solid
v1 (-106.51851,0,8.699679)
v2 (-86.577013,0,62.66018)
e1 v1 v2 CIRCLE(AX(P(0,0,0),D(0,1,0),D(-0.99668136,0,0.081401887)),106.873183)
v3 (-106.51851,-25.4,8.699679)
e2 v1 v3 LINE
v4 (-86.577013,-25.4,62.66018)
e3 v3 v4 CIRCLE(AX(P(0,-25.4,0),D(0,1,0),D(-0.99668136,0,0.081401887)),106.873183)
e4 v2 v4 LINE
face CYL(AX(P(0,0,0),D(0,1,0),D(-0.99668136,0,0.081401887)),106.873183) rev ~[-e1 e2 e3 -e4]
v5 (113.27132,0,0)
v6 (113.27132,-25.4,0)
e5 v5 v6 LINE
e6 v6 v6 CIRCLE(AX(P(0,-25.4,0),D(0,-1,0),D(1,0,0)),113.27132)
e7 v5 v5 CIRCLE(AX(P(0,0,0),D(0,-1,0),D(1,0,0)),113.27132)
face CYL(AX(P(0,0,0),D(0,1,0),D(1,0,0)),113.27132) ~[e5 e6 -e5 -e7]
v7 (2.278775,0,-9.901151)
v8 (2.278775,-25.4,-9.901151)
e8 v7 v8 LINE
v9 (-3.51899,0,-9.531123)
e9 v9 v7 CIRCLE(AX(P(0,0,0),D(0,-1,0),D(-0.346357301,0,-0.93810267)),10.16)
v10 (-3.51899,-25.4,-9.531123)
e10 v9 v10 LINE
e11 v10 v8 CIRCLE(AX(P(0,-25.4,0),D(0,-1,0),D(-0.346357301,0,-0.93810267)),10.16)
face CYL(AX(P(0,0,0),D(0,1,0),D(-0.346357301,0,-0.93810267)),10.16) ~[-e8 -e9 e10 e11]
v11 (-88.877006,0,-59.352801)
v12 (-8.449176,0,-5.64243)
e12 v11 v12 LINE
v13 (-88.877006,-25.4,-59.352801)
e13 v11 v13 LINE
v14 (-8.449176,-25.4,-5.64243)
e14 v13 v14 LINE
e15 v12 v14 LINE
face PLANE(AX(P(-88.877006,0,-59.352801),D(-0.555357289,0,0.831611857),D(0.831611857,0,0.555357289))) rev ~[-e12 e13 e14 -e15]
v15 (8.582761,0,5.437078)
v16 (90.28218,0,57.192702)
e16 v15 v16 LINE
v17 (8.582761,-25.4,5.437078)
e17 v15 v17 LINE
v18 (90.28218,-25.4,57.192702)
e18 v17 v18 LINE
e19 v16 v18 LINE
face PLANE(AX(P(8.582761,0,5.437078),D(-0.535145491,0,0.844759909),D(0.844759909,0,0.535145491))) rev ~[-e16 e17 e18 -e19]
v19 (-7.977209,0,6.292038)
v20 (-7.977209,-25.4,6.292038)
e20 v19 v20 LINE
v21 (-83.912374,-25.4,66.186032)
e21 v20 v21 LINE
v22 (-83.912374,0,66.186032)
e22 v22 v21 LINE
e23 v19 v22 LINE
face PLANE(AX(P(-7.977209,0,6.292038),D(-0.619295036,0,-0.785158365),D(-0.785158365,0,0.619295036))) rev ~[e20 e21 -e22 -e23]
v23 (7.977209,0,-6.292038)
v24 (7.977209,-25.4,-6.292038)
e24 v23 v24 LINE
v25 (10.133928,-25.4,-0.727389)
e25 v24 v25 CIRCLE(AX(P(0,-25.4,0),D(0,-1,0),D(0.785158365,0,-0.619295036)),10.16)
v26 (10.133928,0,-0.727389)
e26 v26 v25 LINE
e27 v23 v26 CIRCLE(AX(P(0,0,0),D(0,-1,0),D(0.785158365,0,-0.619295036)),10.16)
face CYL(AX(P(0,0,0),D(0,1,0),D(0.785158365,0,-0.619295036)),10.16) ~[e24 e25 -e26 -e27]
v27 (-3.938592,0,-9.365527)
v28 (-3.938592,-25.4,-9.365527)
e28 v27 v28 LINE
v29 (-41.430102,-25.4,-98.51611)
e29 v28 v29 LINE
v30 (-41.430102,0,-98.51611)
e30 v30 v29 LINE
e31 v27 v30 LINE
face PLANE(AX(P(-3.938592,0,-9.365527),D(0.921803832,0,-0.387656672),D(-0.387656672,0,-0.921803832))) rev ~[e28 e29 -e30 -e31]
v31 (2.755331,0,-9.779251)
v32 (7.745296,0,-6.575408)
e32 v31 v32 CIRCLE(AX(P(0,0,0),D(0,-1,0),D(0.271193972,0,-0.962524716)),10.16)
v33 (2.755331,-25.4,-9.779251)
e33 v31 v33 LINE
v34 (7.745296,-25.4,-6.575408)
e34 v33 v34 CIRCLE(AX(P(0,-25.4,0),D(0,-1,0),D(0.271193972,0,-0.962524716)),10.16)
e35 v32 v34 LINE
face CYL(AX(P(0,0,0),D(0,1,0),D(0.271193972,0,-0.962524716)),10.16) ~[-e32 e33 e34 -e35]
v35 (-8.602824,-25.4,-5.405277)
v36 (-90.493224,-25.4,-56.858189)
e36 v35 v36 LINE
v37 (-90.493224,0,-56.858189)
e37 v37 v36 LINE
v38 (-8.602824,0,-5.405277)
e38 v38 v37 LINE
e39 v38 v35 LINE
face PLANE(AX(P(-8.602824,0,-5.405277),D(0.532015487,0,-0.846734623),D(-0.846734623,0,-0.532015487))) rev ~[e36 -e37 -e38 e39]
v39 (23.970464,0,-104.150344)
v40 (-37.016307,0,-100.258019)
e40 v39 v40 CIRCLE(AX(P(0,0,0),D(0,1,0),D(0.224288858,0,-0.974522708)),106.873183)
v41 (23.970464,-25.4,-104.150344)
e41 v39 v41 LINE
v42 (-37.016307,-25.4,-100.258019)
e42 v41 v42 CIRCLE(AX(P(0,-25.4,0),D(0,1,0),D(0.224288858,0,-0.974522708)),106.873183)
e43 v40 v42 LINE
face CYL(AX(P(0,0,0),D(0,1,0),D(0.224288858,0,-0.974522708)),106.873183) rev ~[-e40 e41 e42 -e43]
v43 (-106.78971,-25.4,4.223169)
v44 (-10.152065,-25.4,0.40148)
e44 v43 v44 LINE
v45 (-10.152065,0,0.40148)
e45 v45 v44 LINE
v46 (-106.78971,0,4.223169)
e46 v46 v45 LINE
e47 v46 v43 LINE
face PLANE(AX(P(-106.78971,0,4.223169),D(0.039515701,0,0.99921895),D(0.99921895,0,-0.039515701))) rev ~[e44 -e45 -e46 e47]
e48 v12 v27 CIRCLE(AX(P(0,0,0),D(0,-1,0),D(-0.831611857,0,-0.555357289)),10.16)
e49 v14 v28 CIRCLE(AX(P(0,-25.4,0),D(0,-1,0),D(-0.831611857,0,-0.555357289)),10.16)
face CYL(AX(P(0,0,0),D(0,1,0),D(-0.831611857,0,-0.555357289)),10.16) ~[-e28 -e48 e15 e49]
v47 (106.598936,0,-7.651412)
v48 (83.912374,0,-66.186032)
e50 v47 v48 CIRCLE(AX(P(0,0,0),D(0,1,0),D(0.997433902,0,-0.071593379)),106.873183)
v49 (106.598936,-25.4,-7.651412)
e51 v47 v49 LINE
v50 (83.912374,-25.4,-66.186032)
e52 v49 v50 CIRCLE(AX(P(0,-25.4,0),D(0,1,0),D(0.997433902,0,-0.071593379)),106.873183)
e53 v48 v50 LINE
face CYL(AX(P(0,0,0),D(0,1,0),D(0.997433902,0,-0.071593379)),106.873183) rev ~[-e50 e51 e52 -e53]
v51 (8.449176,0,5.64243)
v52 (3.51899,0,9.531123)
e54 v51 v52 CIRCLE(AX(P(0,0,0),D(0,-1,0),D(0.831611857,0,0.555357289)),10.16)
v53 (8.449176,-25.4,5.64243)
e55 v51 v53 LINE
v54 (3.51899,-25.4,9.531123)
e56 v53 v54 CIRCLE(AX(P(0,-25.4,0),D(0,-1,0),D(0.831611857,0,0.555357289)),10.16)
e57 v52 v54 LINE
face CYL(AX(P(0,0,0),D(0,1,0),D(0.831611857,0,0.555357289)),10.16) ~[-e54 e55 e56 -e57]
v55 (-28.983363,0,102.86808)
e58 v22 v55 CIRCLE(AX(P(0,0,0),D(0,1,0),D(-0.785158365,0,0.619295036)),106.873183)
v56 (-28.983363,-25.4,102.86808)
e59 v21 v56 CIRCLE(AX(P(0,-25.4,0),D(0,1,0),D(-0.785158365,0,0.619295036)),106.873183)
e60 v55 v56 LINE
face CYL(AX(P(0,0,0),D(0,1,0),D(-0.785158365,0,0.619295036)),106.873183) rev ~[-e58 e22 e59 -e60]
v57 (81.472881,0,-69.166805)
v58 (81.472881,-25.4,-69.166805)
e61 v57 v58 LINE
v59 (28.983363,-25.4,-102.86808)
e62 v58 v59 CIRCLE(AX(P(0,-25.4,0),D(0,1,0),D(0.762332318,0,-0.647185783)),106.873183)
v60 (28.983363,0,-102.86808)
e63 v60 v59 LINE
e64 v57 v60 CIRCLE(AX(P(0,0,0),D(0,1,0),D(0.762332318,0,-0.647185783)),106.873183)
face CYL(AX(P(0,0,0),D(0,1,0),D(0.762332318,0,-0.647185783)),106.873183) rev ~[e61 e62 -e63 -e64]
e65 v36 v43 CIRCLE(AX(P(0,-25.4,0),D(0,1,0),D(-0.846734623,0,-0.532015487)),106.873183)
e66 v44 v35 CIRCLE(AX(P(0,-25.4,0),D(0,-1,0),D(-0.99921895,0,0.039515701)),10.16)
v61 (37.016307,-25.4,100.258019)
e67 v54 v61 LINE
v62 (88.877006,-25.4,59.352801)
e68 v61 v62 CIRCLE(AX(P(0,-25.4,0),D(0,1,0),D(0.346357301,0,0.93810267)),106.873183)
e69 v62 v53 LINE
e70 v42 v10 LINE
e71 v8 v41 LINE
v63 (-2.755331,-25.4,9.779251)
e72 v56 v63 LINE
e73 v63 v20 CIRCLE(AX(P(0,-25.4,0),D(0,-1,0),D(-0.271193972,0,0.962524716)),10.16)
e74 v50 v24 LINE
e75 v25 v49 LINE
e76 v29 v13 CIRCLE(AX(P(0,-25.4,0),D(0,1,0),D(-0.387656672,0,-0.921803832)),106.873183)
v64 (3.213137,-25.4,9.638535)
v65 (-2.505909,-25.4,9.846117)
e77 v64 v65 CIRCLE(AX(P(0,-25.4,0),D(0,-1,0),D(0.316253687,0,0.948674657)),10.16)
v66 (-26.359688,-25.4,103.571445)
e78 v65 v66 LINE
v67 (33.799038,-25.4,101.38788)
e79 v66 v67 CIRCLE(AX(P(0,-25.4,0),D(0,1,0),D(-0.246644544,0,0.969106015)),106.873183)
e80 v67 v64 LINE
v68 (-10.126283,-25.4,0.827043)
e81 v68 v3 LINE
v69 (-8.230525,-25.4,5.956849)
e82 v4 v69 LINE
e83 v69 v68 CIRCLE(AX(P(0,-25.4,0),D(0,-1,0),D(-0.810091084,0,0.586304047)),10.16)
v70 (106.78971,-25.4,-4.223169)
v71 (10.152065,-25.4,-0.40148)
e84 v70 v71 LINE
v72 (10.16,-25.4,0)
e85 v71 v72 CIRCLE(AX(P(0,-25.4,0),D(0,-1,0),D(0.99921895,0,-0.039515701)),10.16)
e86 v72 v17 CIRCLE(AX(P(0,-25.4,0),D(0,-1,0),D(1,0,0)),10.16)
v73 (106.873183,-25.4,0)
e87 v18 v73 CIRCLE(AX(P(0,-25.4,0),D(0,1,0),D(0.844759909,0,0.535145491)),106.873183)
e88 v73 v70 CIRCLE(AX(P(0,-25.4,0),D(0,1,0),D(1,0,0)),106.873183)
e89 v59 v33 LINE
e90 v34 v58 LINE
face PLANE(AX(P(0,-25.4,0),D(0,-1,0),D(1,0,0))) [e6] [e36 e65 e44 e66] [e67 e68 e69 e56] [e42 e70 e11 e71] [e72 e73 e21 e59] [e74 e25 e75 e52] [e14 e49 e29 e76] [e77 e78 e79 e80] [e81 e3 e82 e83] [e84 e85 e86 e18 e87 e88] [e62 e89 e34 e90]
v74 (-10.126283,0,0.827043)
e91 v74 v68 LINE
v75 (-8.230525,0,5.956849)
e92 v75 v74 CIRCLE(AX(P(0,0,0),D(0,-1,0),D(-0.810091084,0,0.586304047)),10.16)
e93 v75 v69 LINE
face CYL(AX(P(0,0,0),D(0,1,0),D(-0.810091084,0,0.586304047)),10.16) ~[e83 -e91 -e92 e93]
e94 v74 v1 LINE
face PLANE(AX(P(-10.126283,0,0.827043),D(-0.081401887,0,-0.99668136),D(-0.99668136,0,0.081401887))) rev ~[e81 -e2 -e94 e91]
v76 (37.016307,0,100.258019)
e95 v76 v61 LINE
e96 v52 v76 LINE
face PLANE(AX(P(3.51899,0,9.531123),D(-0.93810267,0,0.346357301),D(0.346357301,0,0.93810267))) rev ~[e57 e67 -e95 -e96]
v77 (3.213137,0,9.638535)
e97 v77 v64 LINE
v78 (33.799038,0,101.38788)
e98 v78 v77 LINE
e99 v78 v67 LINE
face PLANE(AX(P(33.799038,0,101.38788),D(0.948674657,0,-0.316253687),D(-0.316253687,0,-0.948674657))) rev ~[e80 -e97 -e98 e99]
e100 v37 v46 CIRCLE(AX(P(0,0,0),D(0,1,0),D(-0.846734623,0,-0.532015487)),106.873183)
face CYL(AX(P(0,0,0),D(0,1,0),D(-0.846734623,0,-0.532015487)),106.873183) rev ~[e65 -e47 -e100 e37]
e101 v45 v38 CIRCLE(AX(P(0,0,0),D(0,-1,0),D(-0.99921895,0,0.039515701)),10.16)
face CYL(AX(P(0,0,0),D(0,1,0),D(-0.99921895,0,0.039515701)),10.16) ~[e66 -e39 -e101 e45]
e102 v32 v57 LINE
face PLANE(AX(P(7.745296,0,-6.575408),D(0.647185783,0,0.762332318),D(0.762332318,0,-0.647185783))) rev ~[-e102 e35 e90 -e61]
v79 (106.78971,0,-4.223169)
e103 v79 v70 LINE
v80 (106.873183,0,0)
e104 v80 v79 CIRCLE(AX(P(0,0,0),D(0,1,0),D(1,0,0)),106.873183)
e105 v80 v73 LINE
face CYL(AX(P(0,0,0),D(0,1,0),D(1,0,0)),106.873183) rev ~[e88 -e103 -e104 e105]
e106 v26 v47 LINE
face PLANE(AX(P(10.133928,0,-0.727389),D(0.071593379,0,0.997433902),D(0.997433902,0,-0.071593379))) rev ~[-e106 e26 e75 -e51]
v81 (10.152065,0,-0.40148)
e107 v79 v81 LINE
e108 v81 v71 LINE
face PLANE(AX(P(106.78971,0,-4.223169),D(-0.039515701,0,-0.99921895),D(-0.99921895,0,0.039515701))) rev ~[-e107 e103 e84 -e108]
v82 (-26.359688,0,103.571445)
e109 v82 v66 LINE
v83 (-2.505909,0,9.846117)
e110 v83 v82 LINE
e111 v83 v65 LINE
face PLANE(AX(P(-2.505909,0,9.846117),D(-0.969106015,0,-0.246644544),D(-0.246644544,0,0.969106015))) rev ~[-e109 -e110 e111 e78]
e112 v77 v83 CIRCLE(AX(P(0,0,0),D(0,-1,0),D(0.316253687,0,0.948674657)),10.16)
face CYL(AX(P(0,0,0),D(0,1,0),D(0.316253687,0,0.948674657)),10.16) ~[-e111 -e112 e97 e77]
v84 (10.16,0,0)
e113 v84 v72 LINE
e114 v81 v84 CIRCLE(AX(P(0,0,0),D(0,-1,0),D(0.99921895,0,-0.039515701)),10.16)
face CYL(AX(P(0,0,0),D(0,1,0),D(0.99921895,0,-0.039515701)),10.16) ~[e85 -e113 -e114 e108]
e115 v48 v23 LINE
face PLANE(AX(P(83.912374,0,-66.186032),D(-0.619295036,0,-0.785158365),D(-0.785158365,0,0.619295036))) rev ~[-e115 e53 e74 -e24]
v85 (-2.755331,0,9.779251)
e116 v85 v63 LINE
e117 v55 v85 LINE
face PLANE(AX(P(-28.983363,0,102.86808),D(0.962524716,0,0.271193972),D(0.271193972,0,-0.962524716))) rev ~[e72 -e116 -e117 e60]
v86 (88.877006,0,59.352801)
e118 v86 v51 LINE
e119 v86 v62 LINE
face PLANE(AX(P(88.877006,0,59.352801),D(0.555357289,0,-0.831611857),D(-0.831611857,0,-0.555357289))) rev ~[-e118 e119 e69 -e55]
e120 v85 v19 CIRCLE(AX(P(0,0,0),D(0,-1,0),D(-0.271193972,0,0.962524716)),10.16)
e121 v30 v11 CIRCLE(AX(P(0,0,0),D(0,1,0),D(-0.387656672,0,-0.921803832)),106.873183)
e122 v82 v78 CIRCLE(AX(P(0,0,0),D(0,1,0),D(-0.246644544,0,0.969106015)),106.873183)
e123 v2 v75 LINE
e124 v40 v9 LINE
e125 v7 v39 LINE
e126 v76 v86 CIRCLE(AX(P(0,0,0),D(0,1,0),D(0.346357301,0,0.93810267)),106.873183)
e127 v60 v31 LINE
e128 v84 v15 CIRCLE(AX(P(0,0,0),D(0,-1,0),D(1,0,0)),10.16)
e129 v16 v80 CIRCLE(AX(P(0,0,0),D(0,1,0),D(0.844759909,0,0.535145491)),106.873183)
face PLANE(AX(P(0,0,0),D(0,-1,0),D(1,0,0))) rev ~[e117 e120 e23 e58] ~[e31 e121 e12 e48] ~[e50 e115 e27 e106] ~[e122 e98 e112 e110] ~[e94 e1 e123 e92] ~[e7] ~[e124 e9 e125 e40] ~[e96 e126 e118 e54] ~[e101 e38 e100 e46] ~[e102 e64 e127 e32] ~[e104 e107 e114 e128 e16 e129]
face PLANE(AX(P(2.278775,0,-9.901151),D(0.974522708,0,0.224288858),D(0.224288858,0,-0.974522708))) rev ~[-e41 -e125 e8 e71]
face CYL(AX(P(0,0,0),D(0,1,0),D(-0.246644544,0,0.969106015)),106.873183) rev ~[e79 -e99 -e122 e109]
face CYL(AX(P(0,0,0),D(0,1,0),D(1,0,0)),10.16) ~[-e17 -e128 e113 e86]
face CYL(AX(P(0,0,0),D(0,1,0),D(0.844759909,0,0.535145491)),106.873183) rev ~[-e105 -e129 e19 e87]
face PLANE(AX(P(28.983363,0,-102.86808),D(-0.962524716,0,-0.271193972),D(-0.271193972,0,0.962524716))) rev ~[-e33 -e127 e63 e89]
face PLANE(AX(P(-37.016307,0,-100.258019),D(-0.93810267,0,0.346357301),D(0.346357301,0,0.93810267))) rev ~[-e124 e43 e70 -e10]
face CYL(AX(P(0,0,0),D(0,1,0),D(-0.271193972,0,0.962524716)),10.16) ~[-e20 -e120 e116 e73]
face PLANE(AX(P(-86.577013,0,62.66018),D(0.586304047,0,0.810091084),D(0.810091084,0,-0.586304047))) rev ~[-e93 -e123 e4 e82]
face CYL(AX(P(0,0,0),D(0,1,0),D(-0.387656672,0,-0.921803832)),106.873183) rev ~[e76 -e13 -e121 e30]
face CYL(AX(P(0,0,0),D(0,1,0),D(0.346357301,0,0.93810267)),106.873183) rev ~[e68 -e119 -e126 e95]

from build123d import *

# Parameters (mm, degrees)
F1_DEPTH = 25.4
F0_R     = 113.2713200319
F2_DEPTH = 25.4


with BuildPart() as f1:
    # F0 (on Front) → F1 (new body)
    with BuildSketch(Plane.XZ):
        with BuildLine():
            Line((0, 0), (8.4491764715, 5.6424300575))
            ThreePointArc((8.4491764715, 5.6424300575), (6.2920375632, 7.9772089921), (3.518990179, 9.53112313))
            Line((3.518990179, 9.53112313), (0, 0))
        make_face()
        with BuildLine():
            Line((-2.5059085691, 9.8461171151), (0, 0))
            Line((0, 0), (3.2131374582, 9.6385345191))
            ThreePointArc((3.2131374582, 9.6385345191), (0.3685319646, 10.1533139512), (-2.5059085691, 9.8461171151))
        make_face()
        with BuildLine():
            Line((-7.9772089921, 6.2920375632), (0, 0))
            Line((0, 0), (-2.7553307558, 9.7792511179))
            ThreePointArc((-2.7553307558, 9.7792511179), (-5.6424300575, 8.4491764715), (-7.9772089921, 6.2920375632))
        make_face()
        with BuildLine():
            Line((-10.1262826145, 0.8270431738), (0, 0))
            Line((0, 0), (-8.2305254154, 5.9568491156))
            ThreePointArc((-8.2305254154, 5.9568491156), (-9.5300486626, 3.5218989889), (-10.1262826145, 0.8270431738))
        make_face()
        with BuildLine():
            Line((-8.6028237663, -5.4052773514), (0, 0))
            Line((0, 0), (-10.1520645288, 0.4014795179))
            ThreePointArc((-10.1520645288, 0.4014795179), (-9.816621877, -2.619071386), (-8.6028237663, -5.4052773514))
        make_face()
        with BuildLine():
            Line((2.2787747925, -9.9011507132), (0, 0))
            Line((0, 0), (-3.518990179, -9.53112313))
            ThreePointArc((-3.518990179, -9.53112313), (-0.6471195054, -10.139370609), (2.2787747925, -9.9011507132))
        make_face()
        with BuildLine():
            Line((7.7452963463, -6.5754075545), (0, 0))
            Line((0, 0), (2.7553307558, -9.7792511179))
            ThreePointArc((2.7553307558, -9.7792511179), (5.4892573067, -8.5494826873), (7.7452963463, -6.5754075545))
        make_face()
        with BuildLine():
            Line((10.1339284401, -0.727388734), (0, 0))
            Line((0, 0), (7.9772089921, -6.2920375632))
            ThreePointArc((7.9772089921, -6.2920375632), (9.4733655012, -3.6716407885), (10.1339284401, -0.727388734))
        make_face()
        with BuildLine():
            Line((-2.7553307558, 9.7792511179), (0, 0))
            Line((0, 0), (-2.5059085691, 9.8461171151))
            ThreePointArc((-2.5059085691, 9.8461171151), (-2.6308321067, 9.8134765719), (-2.7553307558, 9.7792511179))
        make_face()
        with BuildLine():
            Line((-8.2305254154, 5.9568491156), (0, 0))
            Line((0, 0), (-7.9772089921, 6.2920375632))
            ThreePointArc((-7.9772089921, 6.2920375632), (-8.1056000074, 6.1257528942), (-8.2305254154, 5.9568491156))
        make_face()
        with BuildLine():
            Line((-10.1520645288, 0.4014795179), (0, 0))
            Line((0, 0), (-10.1262826145, 0.8270431738))
            ThreePointArc((-10.1262826145, 0.8270431738), (-10.1414060575, 0.6143965965), (-10.1520645288, 0.4014795179))
        make_face()
        with BuildLine():
            Line((-8.4491764715, -5.6424300575), (0, 0))
            Line((0, 0), (-8.6028237663, -5.4052773514))
            ThreePointArc((-8.6028237663, -5.4052773514), (-8.5268246363, -5.5243878956), (-8.4491764715, -5.6424300575))
        make_face()
        with BuildLine():
            Line((-3.9385917856, -9.3655269337), (0, 0))
            Line((0, 0), (-8.4491764715, -5.6424300575))
            ThreePointArc((-8.4491764715, -5.6424300575), (-6.4675778453, -7.8355623164), (-3.9385917856, -9.3655269337))
        make_face()
        with BuildLine():
            Line((2.7553307558, -9.7792511179), (0, 0))
            Line((0, 0), (2.2787747925, -9.9011507132))
            ThreePointArc((2.2787747925, -9.9011507132), (2.517790608, -9.8430854133), (2.7553307558, -9.7792511179))
        make_face()
        with BuildLine():
            Line((-3.518990179, -9.53112313), (0, 0))
            Line((0, 0), (-3.9385917856, -9.3655269337))
            ThreePointArc((-3.9385917856, -9.3655269337), (-3.7297101382, -9.4506540665), (-3.518990179, -9.53112313))
        make_face()
        with BuildLine():
            Line((7.9772089921, -6.2920375632), (0, 0))
            Line((0, 0), (7.7452963463, -6.5754075545))
            ThreePointArc((7.7452963463, -6.5754075545), (7.8625293746, -6.4347674265), (7.9772089921, -6.2920375632))
        make_face()
        with BuildLine():
            ThreePointArc((10.1339284401, -0.727388734), (10.1443053921, -0.5645069636), (10.1520645288, -0.4014795179))
            Line((10.1520645288, -0.4014795179), (0, 0))
            Line((0, 0), (10.1339284401, -0.727388734))
        make_face()
        with BuildLine():
            ThreePointArc((10.1520645288, -0.4014795179), (10.1580159385, -0.2007789674), (10.16, 0))
            ThreePointArc((10.16, 0), (9.7577263861, 2.8306140277), (8.5827606744, 5.4370781864))
            Line((8.5827606744, 5.4370781864), (0, 0))
            Line((0, 0), (10.1520645288, -0.4014795179))
        make_face()
        with BuildLine():
            Line((0, 0), (8.5827606744, 5.4370781864))
            ThreePointArc((8.5827606744, 5.4370781864), (8.5165875257, 5.5401567592), (8.4491764715, 5.6424300575))
            Line((8.4491764715, 5.6424300575), (0, 0))
        make_face()
        with BuildLine():
            Line((3.2131374582, 9.6385345191), (0, 0))
            Line((0, 0), (3.518990179, 9.53112313))
            ThreePointArc((3.518990179, 9.53112313), (3.3664922297, 9.5860487203), (3.2131374582, 9.6385345191))
        make_face()
    extrude(amount=F1_DEPTH)

    # F0 (on Front) → F2 (join)
    with BuildSketch(Plane.XZ):
        Circle(F0_R)
        Polygon((90.5068083934, 60.4411965841), (91.6145348169, 58.0367329004), (104.7544467964, 29.5148519638), (108.7479900799, -4.3006120088), (108.0596985006, -7.7562623179), (102.0965224025, -37.6951021138), (85.4511357641, -67.3997329867), (60.4411965841, -90.5068083934), (29.5148519638, -104.7544467964), (-4.3006120088, -108.7479900799), (-37.6951021138, -102.0965224025), (-67.3997329867, -85.4511357641), (-90.5068083934, -60.4411965841), (-91.7838875883, -57.669130774), (-104.7544467964, -29.5148519638), (-108.7479900799, 4.3006120088), (-107.850128026, 8.8084359851), (-102.0965224025, 37.6951021138), (-87.6655406442, 63.4480026369), (-85.4511357641, 67.3997329867), (-60.4411965841, 90.5068083934), (-29.5148519638, 104.7544467964), (-26.7440517016, 105.0816731443), (4.3006120088, 108.7479900799), (34.2631514946, 102.7800935109), (37.6951021138, 102.0965224025), (67.3997329867, 85.4511357641), align=None, mode=Mode.SUBTRACT)
        with BuildLine():
            ThreePointArc((-8.2305254154, 5.9568491156), (-8.1056000074, 6.1257528942), (-7.9772089921, 6.2920375632))
            Line((-7.9772089921, 6.2920375632), (-83.9123738102, 66.1860318007))
            ThreePointArc((-83.9123738102, 66.1860318007), (-85.2629207095, 64.4368810237), (-86.577012837, 62.6601797971))
            Line((-86.577012837, 62.6601797971), (-8.2305254154, 5.9568491156))
        make_face()
        with BuildLine():
            Line((-28.9833630506, 102.8680803274), (-2.7553307558, 9.7792511179))
            ThreePointArc((-2.7553307558, 9.7792511179), (-2.6308321067, 9.8134765719), (-2.5059085691, 9.8461171151))
            Line((-2.5059085691, 9.8461171151), (-26.3596875538, 103.5714446942))
            ThreePointArc((-26.3596875538, 103.5714446942), (-27.6737600067, 103.2280983602), (-28.9833630506, 102.8680803274))
        make_face()
        with BuildLine():
            ThreePointArc((3.2131374582, 9.6385345191), (3.3664922297, 9.5860487203), (3.518990179, 9.53112313))
            Line((3.518990179, 9.53112313), (37.0163072861, 100.2580185266))
            ThreePointArc((37.0163072861, 100.2580185266), (35.4121792077, 100.8357815844), (33.7990382049, 101.3878804414))
            Line((33.7990382049, 101.3878804414), (3.2131374582, 9.6385345191))
        make_face()
        with BuildLine():
            ThreePointArc((8.4491764715, 5.6424300575), (8.5165875257, 5.5401567592), (8.5827606744, 5.4370781864))
            Line((8.5827606744, 5.4370781864), (90.282180491, 57.1927020673))
            ThreePointArc((90.282180491, 57.1927020673), (89.5861042071, 58.2769870272), (88.8770063774, 59.3528012933))
            Line((88.8770063774, 59.3528012933), (8.4491764715, 5.6424300575))
        make_face()
        with BuildLine():
            Line((106.789709851, -4.2231687065), (10.1520645288, -0.4014795179))
            ThreePointArc((10.1520645288, -0.4014795179), (10.1443053921, -0.5645069636), (10.1339284401, -0.727388734))
            Line((10.1339284401, -0.727388734), (106.5989360787, -7.6514123443))
            ThreePointArc((106.5989360787, -7.6514123443), (106.7080913827, -5.9380567058), (106.789709851, -4.2231687065))
        make_face()
        with BuildLine():
            Line((83.9123738102, -66.1860318007), (7.9772089921, -6.2920375632))
            ThreePointArc((7.9772089921, -6.2920375632), (7.8625293746, -6.4347674265), (7.7452963463, -6.5754075545))
            Line((7.7452963463, -6.5754075545), (81.4728814213, -69.1668047323))
            ThreePointArc((81.4728814213, -69.1668047323), (82.7060572982, -67.687409244), (83.9123738102, -66.1860318007))
        make_face()
        with BuildLine():
            Line((28.9833630506, -102.8680803274), (2.7553307558, -9.7792511179))
            ThreePointArc((2.7553307558, -9.7792511179), (2.517790608, -9.8430854133), (2.2787747925, -9.9011507132))
            Line((2.2787747925, -9.9011507132), (23.9704641575, -104.1503438883))
            ThreePointArc((23.9704641575, -104.1503438883), (26.4846748886, -103.5395541811), (28.9833630506, -102.8680803274))
        make_face()
        with BuildLine():
            Line((-37.0163072861, -100.2580185266), (-3.518990179, -9.53112313))
            ThreePointArc((-3.518990179, -9.53112313), (-3.7297101382, -9.4506540665), (-3.9385917856, -9.3655269337))
            Line((-3.9385917856, -9.3655269337), (-41.4301024994, -98.5161098038))
            ThreePointArc((-41.4301024994, -98.5161098038), (-39.2328735062, -99.4115633134), (-37.0163072861, -100.2580185266))
        make_face()
        with BuildLine():
            Line((-88.8770063774, -59.3528012933), (-8.4491764715, -5.6424300575))
            ThreePointArc((-8.4491764715, -5.6424300575), (-8.5268246363, -5.5243878956), (-8.6028237663, -5.4052773514))
            Line((-8.6028237663, -5.4052773514), (-90.4932244371, -56.8581886358))
            ThreePointArc((-90.4932244371, -56.8581886358), (-89.6937885179, -58.1111141287), (-88.8770063774, -59.3528012933))
        make_face()
        with BuildLine():
            Line((-106.789709851, 4.2231687065), (-10.1520645288, 0.4014795179))
            ThreePointArc((-10.1520645288, 0.4014795179), (-10.1414060575, 0.6143965965), (-10.1262826145, 0.8270431738))
            Line((-10.1262826145, 0.8270431738), (-106.5185095312, 8.6996788006))
            ThreePointArc((-106.5185095312, 8.6996788006), (-106.6775932408, 6.462846457), (-106.789709851, 4.2231687065))
        make_face()
        with BuildLine():
            ThreePointArc((-86.577012837, 62.6601797971), (-85.2629207095, 64.4368810237), (-83.9123738102, 66.1860318007))
            Line((-83.9123738102, 66.1860318007), (-85.4511357641, 67.3997329867))
            Line((-85.4511357641, 67.3997329867), (-87.6655406442, 63.4480026369))
            Line((-87.6655406442, 63.4480026369), (-86.577012837, 62.6601797971))
        make_face()
        with BuildLine():
            Line((-108.7479900799, 4.3006120088), (-106.789709851, 4.2231687065))
            ThreePointArc((-106.789709851, 4.2231687065), (-106.6775932408, 6.462846457), (-106.5185095312, 8.6996788006))
            Line((-106.5185095312, 8.6996788006), (-107.850128026, 8.8084359851))
            Line((-107.850128026, 8.8084359851), (-108.7479900799, 4.3006120088))
        make_face()
        with BuildLine():
            ThreePointArc((-106.5185095312, 8.6996788006), (-100.2467161886, 37.0469050984), (-86.577012837, 62.6601797971))
            Line((-86.577012837, 62.6601797971), (-87.6655406442, 63.4480026369))
            Line((-87.6655406442, 63.4480026369), (-102.0965224025, 37.6951021138))
            Line((-102.0965224025, 37.6951021138), (-107.850128026, 8.8084359851))
            Line((-107.850128026, 8.8084359851), (-106.5185095312, 8.6996788006))
        make_face()
        with BuildLine():
            Line((-91.7838875883, -57.669130774), (-90.4932244371, -56.8581886358))
            ThreePointArc((-90.4932244371, -56.8581886358), (-103.261183869, -27.5500488194), (-106.789709851, 4.2231687065))
            Line((-106.789709851, 4.2231687065), (-108.7479900799, 4.3006120088))
            Line((-108.7479900799, 4.3006120088), (-104.7544467964, -29.5148519638))
            Line((-104.7544467964, -29.5148519638), (-91.7838875883, -57.669130774))
        make_face()
        with BuildLine():
            Line((-90.5068083934, -60.4411965841), (-88.8770063774, -59.3528012933))
            ThreePointArc((-88.8770063774, -59.3528012933), (-89.6937885179, -58.1111141287), (-90.4932244371, -56.8581886358))
            Line((-90.4932244371, -56.8581886358), (-91.7838875883, -57.669130774))
            Line((-91.7838875883, -57.669130774), (-90.5068083934, -60.4411965841))
        make_face()
        with BuildLine():
            Line((-37.6951021138, -102.0965224025), (-37.0163072861, -100.2580185266))
            ThreePointArc((-37.0163072861, -100.2580185266), (-39.2328735062, -99.4115633134), (-41.4301024994, -98.5161098038))
            ThreePointArc((-41.4301024994, -98.5161098038), (-68.0325425023, -82.4223904327), (-88.8770063774, -59.3528012933))
            Line((-88.8770063774, -59.3528012933), (-90.5068083934, -60.4411965841))
            Line((-90.5068083934, -60.4411965841), (-67.3997329867, -85.4511357641))
            Line((-67.3997329867, -85.4511357641), (-37.6951021138, -102.0965224025))
        make_face()
        with BuildLine():
            Line((29.5148519638, -104.7544467964), (28.9833630506, -102.8680803274))
            ThreePointArc((28.9833630506, -102.8680803274), (26.4846748886, -103.5395541811), (23.9704641575, -104.1503438883))
            ThreePointArc((23.9704641575, -104.1503438883), (-6.8070591972, -106.6561823293), (-37.0163072861, -100.2580185266))
            Line((-37.0163072861, -100.2580185266), (-37.6951021138, -102.0965224025))
            Line((-37.6951021138, -102.0965224025), (-4.3006120088, -108.7479900799))
            Line((-4.3006120088, -108.7479900799), (29.5148519638, -104.7544467964))
        make_face()
        with BuildLine():
            Line((85.4511357641, -67.3997329867), (83.9123738102, -66.1860318007))
            ThreePointArc((83.9123738102, -66.1860318007), (82.7060572982, -67.687409244), (81.4728814213, -69.1668047323))
            ThreePointArc((81.4728814213, -69.1668047323), (57.7415749689, -89.9321288755), (28.9833630506, -102.8680803274))
            Line((28.9833630506, -102.8680803274), (29.5148519638, -104.7544467964))
            Line((29.5148519638, -104.7544467964), (60.4411965841, -90.5068083934))
            Line((60.4411965841, -90.5068083934), (85.4511357641, -67.3997329867))
        make_face()
        with BuildLine():
            Line((108.0596985006, -7.7562623179), (106.5989360787, -7.6514123443))
            ThreePointArc((106.5989360787, -7.6514123443), (99.6504652153, -38.6220411987), (83.9123738102, -66.1860318007))
            Line((83.9123738102, -66.1860318007), (85.4511357641, -67.3997329867))
            Line((85.4511357641, -67.3997329867), (102.0965224025, -37.6951021138))
            Line((102.0965224025, -37.6951021138), (108.0596985006, -7.7562623179))
        make_face()
        with BuildLine():
            Line((91.6145348169, 58.0367329004), (90.282180491, 57.1927020673))
            ThreePointArc((90.282180491, 57.1927020673), (102.6416613707, 29.7752688491), (106.8731831844, 0))
            ThreePointArc((106.8731831844, 0), (106.8523128133, -2.1119967875), (106.789709851, -4.2231687065))
            Line((106.789709851, -4.2231687065), (108.7479900799, -4.3006120088))
            Line((108.7479900799, -4.3006120088), (104.7544467964, 29.5148519638))
            Line((104.7544467964, 29.5148519638), (91.6145348169, 58.0367329004))
        make_face()
        with BuildLine():
            Line((108.7479900799, -4.3006120088), (106.789709851, -4.2231687065))
            ThreePointArc((106.789709851, -4.2231687065), (106.7080913827, -5.9380567058), (106.5989360787, -7.6514123443))
            Line((106.5989360787, -7.6514123443), (108.0596985006, -7.7562623179))
            Line((108.0596985006, -7.7562623179), (108.7479900799, -4.3006120088))
        make_face()
        with BuildLine():
            ThreePointArc((88.8770063774, 59.3528012933), (89.5861042071, 58.2769870272), (90.282180491, 57.1927020673))
            Line((90.282180491, 57.1927020673), (91.6145348169, 58.0367329004))
            Line((91.6145348169, 58.0367329004), (90.5068083934, 60.4411965841))
            Line((90.5068083934, 60.4411965841), (88.8770063774, 59.3528012933))
        make_face()
        with BuildLine():
            ThreePointArc((37.0163072861, 100.2580185266), (66.1860318007, 83.9123738102), (88.8770063774, 59.3528012933))
            Line((88.8770063774, 59.3528012933), (90.5068083934, 60.4411965841))
            Line((90.5068083934, 60.4411965841), (67.3997329867, 85.4511357641))
            Line((67.3997329867, 85.4511357641), (37.6951021138, 102.0965224025))
            Line((37.6951021138, 102.0965224025), (37.0163072861, 100.2580185266))
        make_face()
        with BuildLine():
            ThreePointArc((33.7990382049, 101.3878804414), (35.4121792077, 100.8357815844), (37.0163072861, 100.2580185266))
            Line((37.0163072861, 100.2580185266), (37.6951021138, 102.0965224025))
            Line((37.6951021138, 102.0965224025), (34.2631514946, 102.7800935109))
            Line((34.2631514946, 102.7800935109), (33.7990382049, 101.3878804414))
        make_face()
        with BuildLine():
            Line((-26.7440517016, 105.0816731443), (-26.3596875538, 103.5714446942))
            ThreePointArc((-26.3596875538, 103.5714446942), (3.8765929293, 106.8028525426), (33.7990382049, 101.3878804414))
            Line((33.7990382049, 101.3878804414), (34.2631514946, 102.7800935109))
            Line((34.2631514946, 102.7800935109), (4.3006120088, 108.7479900799))
            Line((4.3006120088, 108.7479900799), (-26.7440517016, 105.0816731443))
        make_face()
        with BuildLine():
            ThreePointArc((-83.9123738102, 66.1860318007), (-59.3528012933, 88.8770063774), (-28.9833630506, 102.8680803274))
            Line((-28.9833630506, 102.8680803274), (-29.5148519638, 104.7544467964))
            Line((-29.5148519638, 104.7544467964), (-60.4411965841, 90.5068083934))
            Line((-60.4411965841, 90.5068083934), (-85.4511357641, 67.3997329867))
            Line((-85.4511357641, 67.3997329867), (-83.9123738102, 66.1860318007))
        make_face()
        with BuildLine():
            Line((-29.5148519638, 104.7544467964), (-28.9833630506, 102.8680803274))
            ThreePointArc((-28.9833630506, 102.8680803274), (-27.6737600067, 103.2280983602), (-26.3596875538, 103.5714446942))
            Line((-26.3596875538, 103.5714446942), (-26.7440517016, 105.0816731443))
            Line((-26.7440517016, 105.0816731443), (-29.5148519638, 104.7544467964))
        make_face()
    extrude(amount=F2_DEPTH)


solid = f1.part
